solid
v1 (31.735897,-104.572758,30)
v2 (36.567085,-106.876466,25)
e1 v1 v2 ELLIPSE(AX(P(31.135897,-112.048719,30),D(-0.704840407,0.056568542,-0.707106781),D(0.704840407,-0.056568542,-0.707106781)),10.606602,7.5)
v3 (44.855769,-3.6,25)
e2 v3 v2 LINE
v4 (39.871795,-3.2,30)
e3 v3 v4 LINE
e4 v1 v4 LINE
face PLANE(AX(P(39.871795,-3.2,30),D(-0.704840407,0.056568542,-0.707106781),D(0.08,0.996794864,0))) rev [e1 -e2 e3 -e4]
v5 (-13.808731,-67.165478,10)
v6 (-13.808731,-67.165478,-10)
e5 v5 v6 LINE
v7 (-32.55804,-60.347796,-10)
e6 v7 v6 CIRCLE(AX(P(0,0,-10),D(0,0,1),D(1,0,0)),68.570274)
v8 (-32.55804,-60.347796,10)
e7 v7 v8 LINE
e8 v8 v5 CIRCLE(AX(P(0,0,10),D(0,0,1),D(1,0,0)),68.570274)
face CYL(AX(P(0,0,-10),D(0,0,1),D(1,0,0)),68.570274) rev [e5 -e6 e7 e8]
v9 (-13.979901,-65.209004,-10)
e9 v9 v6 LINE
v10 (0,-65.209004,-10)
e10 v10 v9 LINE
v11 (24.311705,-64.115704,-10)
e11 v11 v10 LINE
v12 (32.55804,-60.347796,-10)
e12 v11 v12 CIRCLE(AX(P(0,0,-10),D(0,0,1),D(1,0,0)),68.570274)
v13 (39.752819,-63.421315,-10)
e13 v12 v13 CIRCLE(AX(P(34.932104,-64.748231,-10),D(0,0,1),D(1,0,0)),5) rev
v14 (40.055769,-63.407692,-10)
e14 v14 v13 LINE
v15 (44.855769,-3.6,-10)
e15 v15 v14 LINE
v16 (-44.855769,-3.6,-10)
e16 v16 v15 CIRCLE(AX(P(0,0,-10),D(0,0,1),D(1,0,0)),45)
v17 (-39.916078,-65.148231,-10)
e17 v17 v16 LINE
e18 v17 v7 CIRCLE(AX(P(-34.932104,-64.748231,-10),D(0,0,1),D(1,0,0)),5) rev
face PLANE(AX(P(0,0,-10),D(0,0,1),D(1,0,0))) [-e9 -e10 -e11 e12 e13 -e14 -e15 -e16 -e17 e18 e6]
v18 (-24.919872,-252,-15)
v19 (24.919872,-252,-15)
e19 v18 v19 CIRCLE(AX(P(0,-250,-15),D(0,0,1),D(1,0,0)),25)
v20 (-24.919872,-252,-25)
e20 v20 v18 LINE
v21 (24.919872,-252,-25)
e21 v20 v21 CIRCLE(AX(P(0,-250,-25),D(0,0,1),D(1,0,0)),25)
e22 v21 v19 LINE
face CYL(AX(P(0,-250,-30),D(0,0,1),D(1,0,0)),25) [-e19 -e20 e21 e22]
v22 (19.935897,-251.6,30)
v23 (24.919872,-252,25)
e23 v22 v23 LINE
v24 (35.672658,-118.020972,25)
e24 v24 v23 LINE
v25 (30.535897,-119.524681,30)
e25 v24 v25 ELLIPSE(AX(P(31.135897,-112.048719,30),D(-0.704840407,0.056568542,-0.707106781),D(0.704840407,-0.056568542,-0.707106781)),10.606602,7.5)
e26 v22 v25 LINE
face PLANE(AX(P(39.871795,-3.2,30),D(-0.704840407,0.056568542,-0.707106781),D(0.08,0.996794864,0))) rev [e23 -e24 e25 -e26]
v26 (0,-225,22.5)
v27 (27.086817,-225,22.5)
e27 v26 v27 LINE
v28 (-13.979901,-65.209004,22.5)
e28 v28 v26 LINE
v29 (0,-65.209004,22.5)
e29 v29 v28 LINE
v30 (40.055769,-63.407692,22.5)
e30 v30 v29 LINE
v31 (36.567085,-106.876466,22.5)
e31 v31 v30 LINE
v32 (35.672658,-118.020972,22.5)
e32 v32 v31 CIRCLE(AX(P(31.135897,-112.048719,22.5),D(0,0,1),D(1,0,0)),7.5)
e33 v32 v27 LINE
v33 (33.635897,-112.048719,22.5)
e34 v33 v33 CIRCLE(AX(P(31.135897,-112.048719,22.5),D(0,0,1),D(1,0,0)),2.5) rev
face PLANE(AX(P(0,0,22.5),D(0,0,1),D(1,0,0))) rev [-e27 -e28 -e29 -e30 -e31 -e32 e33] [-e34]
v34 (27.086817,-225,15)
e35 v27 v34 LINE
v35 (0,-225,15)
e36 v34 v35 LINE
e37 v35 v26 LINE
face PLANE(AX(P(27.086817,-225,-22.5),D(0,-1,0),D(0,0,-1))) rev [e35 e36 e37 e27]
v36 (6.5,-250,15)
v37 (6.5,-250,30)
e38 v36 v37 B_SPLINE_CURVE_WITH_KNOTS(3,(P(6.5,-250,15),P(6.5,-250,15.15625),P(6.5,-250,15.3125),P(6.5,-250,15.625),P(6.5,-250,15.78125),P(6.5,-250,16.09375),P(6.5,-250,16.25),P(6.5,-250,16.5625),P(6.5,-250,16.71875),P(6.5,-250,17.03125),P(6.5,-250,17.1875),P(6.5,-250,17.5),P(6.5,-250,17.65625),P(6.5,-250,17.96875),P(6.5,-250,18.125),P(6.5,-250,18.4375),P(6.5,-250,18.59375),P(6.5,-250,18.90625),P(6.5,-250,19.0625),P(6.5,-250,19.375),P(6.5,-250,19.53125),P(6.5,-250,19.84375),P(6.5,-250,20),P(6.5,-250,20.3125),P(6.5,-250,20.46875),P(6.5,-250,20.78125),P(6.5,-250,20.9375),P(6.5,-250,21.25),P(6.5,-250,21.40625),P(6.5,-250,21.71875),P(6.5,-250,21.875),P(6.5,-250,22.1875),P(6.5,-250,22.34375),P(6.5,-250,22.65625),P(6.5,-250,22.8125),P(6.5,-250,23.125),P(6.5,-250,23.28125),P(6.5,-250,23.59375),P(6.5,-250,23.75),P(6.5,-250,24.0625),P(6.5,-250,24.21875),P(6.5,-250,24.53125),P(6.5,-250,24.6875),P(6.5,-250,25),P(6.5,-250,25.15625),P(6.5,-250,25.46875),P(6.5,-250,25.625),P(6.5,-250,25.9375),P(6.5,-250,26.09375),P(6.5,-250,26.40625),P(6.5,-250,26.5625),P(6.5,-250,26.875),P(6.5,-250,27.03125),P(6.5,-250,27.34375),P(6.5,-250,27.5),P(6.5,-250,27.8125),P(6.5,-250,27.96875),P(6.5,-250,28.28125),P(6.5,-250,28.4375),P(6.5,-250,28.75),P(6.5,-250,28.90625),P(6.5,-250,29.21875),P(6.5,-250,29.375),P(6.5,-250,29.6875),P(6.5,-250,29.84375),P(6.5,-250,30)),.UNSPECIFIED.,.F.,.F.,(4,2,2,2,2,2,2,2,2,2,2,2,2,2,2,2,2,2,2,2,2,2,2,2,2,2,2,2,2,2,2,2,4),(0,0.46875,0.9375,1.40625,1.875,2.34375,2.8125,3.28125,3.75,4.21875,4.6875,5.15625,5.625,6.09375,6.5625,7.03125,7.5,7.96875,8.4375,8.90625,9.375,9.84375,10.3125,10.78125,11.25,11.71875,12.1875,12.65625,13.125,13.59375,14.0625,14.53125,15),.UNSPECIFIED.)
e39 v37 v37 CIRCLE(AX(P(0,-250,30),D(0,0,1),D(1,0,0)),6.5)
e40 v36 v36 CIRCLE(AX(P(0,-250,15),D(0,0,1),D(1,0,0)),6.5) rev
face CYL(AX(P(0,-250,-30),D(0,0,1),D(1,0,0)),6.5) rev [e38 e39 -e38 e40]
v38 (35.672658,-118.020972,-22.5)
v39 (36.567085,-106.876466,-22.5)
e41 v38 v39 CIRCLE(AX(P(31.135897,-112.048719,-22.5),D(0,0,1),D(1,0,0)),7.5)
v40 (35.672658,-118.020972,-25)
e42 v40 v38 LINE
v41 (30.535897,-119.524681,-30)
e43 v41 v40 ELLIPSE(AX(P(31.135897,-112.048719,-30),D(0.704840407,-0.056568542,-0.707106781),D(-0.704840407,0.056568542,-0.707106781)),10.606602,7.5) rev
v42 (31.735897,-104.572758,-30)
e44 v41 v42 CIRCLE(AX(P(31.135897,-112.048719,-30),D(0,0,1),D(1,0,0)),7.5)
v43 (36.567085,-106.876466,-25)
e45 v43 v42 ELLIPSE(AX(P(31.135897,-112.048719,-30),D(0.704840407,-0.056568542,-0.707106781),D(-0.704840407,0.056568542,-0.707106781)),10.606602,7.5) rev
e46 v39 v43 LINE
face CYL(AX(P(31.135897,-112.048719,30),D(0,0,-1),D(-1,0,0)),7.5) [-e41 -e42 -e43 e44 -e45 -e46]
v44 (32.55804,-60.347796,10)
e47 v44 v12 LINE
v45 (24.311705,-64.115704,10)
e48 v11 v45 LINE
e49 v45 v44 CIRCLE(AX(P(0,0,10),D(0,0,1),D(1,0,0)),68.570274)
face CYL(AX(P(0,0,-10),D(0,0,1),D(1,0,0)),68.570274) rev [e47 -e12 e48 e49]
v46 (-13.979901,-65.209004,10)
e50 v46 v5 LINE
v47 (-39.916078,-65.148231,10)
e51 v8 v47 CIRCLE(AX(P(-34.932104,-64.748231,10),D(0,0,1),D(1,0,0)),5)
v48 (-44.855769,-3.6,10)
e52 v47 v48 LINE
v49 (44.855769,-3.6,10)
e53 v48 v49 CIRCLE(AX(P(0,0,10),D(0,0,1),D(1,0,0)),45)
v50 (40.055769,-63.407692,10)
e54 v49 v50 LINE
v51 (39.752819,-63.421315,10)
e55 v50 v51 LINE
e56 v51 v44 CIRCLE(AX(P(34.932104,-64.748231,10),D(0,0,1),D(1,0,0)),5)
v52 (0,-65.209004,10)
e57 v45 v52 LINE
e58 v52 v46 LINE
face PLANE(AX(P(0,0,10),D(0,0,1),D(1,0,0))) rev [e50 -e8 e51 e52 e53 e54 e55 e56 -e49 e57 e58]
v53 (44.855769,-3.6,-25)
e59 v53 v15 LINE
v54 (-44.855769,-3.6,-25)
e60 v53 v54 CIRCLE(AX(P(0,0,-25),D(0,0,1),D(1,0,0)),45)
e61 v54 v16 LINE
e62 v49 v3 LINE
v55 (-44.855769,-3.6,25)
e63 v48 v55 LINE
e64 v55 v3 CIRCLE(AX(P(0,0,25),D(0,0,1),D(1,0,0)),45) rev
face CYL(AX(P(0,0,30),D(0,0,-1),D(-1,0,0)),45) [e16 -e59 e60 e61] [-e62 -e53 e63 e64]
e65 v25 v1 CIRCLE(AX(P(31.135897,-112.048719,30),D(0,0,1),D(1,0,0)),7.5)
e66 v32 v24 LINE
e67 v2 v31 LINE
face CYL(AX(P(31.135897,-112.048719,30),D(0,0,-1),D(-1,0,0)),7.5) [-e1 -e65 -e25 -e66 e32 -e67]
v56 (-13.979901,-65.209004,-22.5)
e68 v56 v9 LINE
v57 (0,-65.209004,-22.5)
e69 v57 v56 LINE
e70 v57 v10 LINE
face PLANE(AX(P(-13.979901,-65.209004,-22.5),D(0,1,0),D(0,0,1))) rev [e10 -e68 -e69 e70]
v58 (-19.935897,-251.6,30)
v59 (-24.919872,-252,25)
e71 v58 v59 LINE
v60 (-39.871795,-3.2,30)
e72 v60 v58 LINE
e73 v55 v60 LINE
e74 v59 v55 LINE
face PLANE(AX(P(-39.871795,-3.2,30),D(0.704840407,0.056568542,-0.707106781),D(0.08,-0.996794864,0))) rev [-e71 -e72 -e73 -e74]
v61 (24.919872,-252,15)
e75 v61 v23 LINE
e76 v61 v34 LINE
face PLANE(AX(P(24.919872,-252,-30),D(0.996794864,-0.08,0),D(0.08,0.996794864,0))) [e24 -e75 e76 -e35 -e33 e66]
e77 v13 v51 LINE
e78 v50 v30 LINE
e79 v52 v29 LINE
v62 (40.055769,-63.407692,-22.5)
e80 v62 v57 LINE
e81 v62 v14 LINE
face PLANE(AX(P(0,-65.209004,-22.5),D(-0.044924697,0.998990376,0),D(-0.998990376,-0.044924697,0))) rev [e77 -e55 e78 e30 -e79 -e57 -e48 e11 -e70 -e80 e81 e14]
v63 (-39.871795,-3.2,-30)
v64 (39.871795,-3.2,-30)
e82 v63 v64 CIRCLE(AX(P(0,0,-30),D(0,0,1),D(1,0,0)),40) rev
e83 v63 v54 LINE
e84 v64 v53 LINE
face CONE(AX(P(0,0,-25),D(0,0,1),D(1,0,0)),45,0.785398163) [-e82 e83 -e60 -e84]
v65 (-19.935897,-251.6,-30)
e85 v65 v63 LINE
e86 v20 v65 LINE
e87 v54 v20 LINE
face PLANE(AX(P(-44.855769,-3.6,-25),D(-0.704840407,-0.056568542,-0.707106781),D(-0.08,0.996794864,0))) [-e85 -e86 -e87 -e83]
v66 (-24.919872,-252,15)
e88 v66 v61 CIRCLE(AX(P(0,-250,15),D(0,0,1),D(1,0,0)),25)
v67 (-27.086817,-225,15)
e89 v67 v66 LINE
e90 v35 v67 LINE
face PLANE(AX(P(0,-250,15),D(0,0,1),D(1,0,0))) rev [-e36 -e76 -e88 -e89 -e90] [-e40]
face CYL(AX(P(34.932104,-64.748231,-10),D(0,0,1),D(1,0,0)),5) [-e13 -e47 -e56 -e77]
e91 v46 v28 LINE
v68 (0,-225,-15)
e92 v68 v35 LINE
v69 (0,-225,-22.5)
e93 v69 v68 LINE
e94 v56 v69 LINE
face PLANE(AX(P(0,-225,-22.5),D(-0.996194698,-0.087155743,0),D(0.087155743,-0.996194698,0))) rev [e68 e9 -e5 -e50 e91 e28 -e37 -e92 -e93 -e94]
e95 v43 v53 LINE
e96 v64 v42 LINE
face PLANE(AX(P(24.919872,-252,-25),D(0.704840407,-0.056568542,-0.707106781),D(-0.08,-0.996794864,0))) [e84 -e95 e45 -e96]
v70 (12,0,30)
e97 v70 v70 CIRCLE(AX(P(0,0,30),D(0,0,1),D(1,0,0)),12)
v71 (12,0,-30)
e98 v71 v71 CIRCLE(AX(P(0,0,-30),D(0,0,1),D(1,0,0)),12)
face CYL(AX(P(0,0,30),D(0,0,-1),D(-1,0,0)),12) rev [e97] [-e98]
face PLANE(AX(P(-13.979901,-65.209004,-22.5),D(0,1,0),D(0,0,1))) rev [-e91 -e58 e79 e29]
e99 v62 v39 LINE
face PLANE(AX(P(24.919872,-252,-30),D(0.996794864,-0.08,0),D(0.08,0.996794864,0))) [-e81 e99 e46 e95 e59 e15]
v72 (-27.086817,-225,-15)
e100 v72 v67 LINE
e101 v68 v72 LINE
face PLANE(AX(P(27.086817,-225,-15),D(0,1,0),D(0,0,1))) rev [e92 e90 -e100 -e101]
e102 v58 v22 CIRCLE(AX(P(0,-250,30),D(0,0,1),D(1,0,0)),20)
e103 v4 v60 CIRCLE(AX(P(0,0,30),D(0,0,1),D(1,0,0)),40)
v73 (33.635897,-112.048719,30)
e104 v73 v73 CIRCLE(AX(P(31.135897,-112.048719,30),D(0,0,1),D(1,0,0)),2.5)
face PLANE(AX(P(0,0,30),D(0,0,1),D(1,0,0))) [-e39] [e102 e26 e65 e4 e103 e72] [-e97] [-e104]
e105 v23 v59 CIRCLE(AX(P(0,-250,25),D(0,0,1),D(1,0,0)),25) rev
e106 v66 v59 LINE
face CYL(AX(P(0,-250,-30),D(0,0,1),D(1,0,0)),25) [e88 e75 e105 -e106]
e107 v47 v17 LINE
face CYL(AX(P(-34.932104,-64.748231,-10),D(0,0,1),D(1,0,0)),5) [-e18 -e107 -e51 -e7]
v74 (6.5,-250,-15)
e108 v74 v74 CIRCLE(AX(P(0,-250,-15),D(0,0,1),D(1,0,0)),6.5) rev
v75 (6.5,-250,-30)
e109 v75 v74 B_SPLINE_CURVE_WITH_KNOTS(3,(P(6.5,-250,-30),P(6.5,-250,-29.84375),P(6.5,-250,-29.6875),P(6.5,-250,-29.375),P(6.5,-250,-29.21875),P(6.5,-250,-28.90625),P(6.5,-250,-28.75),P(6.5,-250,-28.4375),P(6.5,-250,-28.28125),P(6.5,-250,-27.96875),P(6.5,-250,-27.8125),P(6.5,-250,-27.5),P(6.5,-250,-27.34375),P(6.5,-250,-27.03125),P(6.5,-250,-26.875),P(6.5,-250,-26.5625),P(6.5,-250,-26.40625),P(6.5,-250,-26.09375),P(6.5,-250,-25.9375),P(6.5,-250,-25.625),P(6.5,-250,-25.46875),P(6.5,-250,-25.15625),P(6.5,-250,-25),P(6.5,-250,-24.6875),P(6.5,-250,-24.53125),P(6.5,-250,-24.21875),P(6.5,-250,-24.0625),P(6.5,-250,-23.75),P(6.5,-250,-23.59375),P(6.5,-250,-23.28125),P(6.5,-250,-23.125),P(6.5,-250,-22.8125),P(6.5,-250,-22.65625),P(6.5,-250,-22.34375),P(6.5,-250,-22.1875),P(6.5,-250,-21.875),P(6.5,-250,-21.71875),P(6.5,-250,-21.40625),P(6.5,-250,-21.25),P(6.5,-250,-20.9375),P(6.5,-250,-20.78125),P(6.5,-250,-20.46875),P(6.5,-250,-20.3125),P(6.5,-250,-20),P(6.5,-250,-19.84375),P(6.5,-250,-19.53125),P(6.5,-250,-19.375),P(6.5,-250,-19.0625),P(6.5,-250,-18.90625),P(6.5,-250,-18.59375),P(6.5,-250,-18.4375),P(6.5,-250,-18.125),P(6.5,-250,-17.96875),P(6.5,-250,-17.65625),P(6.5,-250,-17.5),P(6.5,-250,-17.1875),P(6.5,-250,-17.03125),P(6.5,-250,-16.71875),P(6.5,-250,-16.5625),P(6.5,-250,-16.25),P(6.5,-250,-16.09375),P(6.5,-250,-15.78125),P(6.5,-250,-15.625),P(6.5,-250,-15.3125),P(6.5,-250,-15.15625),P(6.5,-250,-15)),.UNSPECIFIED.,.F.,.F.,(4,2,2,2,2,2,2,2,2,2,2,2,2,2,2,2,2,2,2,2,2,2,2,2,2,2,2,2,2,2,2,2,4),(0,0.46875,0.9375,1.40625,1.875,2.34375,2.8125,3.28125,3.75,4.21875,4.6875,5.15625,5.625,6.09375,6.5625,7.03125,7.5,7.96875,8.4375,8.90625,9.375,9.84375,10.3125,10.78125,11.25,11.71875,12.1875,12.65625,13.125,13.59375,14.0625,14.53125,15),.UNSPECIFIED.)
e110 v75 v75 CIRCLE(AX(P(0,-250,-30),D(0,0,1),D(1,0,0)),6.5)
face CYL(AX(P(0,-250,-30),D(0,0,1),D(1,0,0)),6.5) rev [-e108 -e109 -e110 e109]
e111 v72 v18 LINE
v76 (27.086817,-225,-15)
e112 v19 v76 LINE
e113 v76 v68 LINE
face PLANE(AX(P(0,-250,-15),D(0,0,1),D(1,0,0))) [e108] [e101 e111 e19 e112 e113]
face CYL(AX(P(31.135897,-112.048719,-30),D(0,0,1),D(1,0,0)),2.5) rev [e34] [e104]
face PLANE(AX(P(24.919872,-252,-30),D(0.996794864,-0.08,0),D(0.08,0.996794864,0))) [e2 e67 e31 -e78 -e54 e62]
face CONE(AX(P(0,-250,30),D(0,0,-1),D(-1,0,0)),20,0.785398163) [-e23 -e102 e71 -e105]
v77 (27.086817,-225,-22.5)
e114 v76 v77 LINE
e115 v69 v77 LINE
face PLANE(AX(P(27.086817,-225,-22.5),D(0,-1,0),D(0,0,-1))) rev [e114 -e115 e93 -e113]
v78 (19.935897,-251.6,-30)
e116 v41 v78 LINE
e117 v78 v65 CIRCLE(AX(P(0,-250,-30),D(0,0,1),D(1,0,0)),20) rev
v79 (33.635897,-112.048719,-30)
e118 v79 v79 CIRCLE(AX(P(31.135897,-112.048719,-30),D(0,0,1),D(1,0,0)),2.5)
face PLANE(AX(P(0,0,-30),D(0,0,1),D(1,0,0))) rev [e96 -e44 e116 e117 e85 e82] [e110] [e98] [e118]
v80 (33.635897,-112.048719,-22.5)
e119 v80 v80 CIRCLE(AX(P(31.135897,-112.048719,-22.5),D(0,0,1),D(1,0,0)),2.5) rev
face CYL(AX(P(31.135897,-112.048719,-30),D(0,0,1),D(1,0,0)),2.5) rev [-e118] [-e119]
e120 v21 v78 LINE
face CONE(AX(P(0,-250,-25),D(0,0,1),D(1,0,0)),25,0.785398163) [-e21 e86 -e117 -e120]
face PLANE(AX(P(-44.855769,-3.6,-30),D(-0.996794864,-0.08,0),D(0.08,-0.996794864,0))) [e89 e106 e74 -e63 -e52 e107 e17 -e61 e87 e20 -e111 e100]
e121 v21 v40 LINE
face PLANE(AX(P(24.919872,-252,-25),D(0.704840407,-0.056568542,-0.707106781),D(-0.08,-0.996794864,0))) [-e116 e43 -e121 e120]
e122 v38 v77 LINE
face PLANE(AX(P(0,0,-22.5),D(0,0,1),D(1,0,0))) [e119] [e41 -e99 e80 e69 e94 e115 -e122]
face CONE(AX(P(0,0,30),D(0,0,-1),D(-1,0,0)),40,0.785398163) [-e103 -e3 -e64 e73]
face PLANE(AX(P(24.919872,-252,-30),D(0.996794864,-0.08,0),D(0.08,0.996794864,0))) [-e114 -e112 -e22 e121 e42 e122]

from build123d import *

# Parameters (mm, degrees)
SKETCH1_R                = 45
SKETCH1_R_2              = 12
BOSS_EXTRUDE1_DEPTH      = 30
SKETCH2_R                = 6.500000000000002
BOSS_EXTRUDE2_DEPTH      = 60.00000000000001
CUT_EXTRUDE1_DEPTH       = 15
CHAMFER1_SIZE            = 5
SKETCH4_R                = 68.57027417716169
CUT_EXTRUDE3_DEPTH       = 10
FILLET1_R                = 5
CUT_EXTRUDE4_DEPTH       = 281.26772914483035
CUT_EXTRUDE4_DEPTH_BACK  = 281.26772914483035
SKETCH5_R                = 2.5000000000000058
BOSS_EXTRUDE3_DEPTH      = 30
BOSS_EXTRUDE3_DEPTH_BACK = 30
SKETCH6_R                = 7.499999999999997
SKETCH6_R_2              = 2.5000000000000058
CUT_EXTRUDE5_DEPTH       = 22.5


with BuildPart() as part:
    # Sketch1 → Boss-Extrude1 (new, symmetric)
    with BuildSketch(Plane.XY):
        Circle(SKETCH1_R)
        Circle(SKETCH1_R_2, mode=Mode.SUBTRACT)
    extrude(amount=BOSS_EXTRUDE1_DEPTH, both=True)

    # Sketch2 → Boss-Extrude2 (add)
    with BuildSketch(Plane.XY.offset(30)):
        with BuildLine():
            Line((-44.85576885975762, -3.600000000000007), (-24.91987158875419, -252))
            ThreePointArc((-24.91987158875419, -252), (3.215e-14, -275), (24.91987158875426, -252))
            Line((24.91987158875426, -252), (44.85576885975761, -3.5999999999999956))
            ThreePointArc((44.85576885975761, -3.5999999999999956), (2.76e-15, -45.000000000000014), (-44.85576885975762, -3.600000000000007))
        make_face()
        with Locations((3.062e-14, -250)):
            Circle(SKETCH2_R, mode=Mode.SUBTRACT)
    extrude(amount=-BOSS_EXTRUDE2_DEPTH)

    # Sketch3 → Cut-Extrude1 (cut, symmetric)
    with BuildSketch(Plane.XY):
        with BuildLine():
            Line((-27.08681694429805, -225), (-24.91987158875419, -252))
            ThreePointArc((-24.91987158875419, -252), (3.215e-14, -275), (24.91987158875426, -252))
            Line((24.91987158875426, -252), (27.086816944298096, -225))
            Line((27.086816944298096, -225), (-27.08681694429805, -225))
        make_face()
    extrude(amount=CUT_EXTRUDE1_DEPTH, both=True, mode=Mode.SUBTRACT)

    # Chamfer1
    chamfer1_edges = [part.edges().sort_by_distance(p)[0] for p in [
        (-1.599e-14, 44.99999999999999, 30),
        (5.77e-15, 44.99999999999999, -29.99999999999991),
        (34.88782022425593, -127.8, -30.000000000000007),
        (3.042e-14, -275, -30.000000000000007),
        (-34.887820224255904, -127.80000000000001, -30.000000000000007),
        (-34.887820224255904, -127.80000000000001, 30),
        (3.042e-14, -275, 30),
        (34.88782022425593, -127.8, 30),
    ]]
    chamfer(chamfer1_edges, length=CHAMFER1_SIZE)

    # Sketch4 → Cut-Extrude3 (cut, symmetric)
    with BuildSketch(Plane.XY):
        Circle(SKETCH4_R)
        with BuildLine():
            ThreePointArc((44.99999999999999, 4.4e-16), (44.963927757087085, -1.8014440472726034), (44.8557688597576, -3.599999999999995))
            ThreePointArc((44.855768859757625, -3.600000000000005), (-8.27e-15, -45.00000000000002), (-44.855768859757625, -3.6000000000000085))
            ThreePointArc((-44.85576885975762, -3.6000000000000054), (-1.8014440472726134, 44.963927757087085), (44.99999999999999, 4.4e-16))
        make_face(mode=Mode.SUBTRACT)
    extrude(amount=CUT_EXTRUDE3_DEPTH, both=True, mode=Mode.SUBTRACT)

    # Fillet1
    # the kernel refuses this fillet: 5 mm, written as the material it takes off along each edge
    with BuildSketch(Plane(origin=(-40.716681036978386, -55.17276851911722, -10), x_dir=(0.07999999999999997, -0.9967948635501691, 0), z_dir=(0, 0, 1))) as fillet1_piece_1:
        with BuildLine():
            CenterArc((10.007537661154231, 4.999999999999998), FILLET1_R, 147.0642758003335, 122.9357241996666)
            ThreePointArc((5.81113251406956, 7.7184892572017425), (3.041676337682726, 3.7567694305680726), (0, 0))
            Line((0, 0), (10.007537661154236, 2e-17))
        make_face()
    extrude(amount=20, mode=Mode.SUBTRACT)
    with BuildSketch(Plane(origin=(40.7166810369784, -55.17276851911721, -10), x_dir=(-0.08000000000000003, -0.9967948635501691, 0), z_dir=(0, 0, 1))) as fillet1_piece_2:
        with BuildLine():
            CenterArc((10.007537661154224, -4.999999999999998), FILLET1_R, 89.99999999999993, 122.93572419966637)
            ThreePointArc((5.811132514069545, -7.718489257201729), (3.0416763376827105, -3.756769430568052), (0, 0))
            Line((0, 0), (10.00753766115423, -4e-17))
        make_face()
    extrude(amount=20, mode=Mode.SUBTRACT)

    # Sketch5 → Cut-Extrude4 (cut, two sides: drawn at the far end of the back side and taken through both)
    with BuildSketch(Plane.XY.offset(-CUT_EXTRUDE4_DEPTH_BACK)):
        with Locations(Location((31.135897271003447, -112.0487191029763, 0), (0, 0, 85.411434264))):
            Circle(SKETCH5_R)
    extrude(amount=CUT_EXTRUDE4_DEPTH + CUT_EXTRUDE4_DEPTH_BACK, mode=Mode.SUBTRACT)

    # Sketch6 → Boss-Extrude3 (add, two sides: drawn at the far end of the back side and taken through both)
    with BuildSketch(Plane.XY.offset(-BOSS_EXTRUDE3_DEPTH_BACK)):
        with Locations((31.135897271003447, -112.0487191029763)):
            Circle(SKETCH6_R)
        with Locations((31.135897271003447, -112.0487191029763)):
            Circle(SKETCH6_R_2, mode=Mode.SUBTRACT)
    extrude(amount=BOSS_EXTRUDE3_DEPTH + BOSS_EXTRUDE3_DEPTH_BACK)

    # Sketch8 → Cut-Extrude5 (cut, symmetric)
    with BuildSketch(Plane.XY):
        Polygon((39.65576885975762, -225), (39.655768859757615, -68.39166613076095), (40.05576885975761, -63.40769181301013), (0, -65.20900375479165), (-13.97990070496815, -65.20900375479165), (2.082e-14, -225), (27.086816944298096, -225), align=None)
    extrude(amount=CUT_EXTRUDE5_DEPTH, both=True, mode=Mode.SUBTRACT)


solid = part.part
